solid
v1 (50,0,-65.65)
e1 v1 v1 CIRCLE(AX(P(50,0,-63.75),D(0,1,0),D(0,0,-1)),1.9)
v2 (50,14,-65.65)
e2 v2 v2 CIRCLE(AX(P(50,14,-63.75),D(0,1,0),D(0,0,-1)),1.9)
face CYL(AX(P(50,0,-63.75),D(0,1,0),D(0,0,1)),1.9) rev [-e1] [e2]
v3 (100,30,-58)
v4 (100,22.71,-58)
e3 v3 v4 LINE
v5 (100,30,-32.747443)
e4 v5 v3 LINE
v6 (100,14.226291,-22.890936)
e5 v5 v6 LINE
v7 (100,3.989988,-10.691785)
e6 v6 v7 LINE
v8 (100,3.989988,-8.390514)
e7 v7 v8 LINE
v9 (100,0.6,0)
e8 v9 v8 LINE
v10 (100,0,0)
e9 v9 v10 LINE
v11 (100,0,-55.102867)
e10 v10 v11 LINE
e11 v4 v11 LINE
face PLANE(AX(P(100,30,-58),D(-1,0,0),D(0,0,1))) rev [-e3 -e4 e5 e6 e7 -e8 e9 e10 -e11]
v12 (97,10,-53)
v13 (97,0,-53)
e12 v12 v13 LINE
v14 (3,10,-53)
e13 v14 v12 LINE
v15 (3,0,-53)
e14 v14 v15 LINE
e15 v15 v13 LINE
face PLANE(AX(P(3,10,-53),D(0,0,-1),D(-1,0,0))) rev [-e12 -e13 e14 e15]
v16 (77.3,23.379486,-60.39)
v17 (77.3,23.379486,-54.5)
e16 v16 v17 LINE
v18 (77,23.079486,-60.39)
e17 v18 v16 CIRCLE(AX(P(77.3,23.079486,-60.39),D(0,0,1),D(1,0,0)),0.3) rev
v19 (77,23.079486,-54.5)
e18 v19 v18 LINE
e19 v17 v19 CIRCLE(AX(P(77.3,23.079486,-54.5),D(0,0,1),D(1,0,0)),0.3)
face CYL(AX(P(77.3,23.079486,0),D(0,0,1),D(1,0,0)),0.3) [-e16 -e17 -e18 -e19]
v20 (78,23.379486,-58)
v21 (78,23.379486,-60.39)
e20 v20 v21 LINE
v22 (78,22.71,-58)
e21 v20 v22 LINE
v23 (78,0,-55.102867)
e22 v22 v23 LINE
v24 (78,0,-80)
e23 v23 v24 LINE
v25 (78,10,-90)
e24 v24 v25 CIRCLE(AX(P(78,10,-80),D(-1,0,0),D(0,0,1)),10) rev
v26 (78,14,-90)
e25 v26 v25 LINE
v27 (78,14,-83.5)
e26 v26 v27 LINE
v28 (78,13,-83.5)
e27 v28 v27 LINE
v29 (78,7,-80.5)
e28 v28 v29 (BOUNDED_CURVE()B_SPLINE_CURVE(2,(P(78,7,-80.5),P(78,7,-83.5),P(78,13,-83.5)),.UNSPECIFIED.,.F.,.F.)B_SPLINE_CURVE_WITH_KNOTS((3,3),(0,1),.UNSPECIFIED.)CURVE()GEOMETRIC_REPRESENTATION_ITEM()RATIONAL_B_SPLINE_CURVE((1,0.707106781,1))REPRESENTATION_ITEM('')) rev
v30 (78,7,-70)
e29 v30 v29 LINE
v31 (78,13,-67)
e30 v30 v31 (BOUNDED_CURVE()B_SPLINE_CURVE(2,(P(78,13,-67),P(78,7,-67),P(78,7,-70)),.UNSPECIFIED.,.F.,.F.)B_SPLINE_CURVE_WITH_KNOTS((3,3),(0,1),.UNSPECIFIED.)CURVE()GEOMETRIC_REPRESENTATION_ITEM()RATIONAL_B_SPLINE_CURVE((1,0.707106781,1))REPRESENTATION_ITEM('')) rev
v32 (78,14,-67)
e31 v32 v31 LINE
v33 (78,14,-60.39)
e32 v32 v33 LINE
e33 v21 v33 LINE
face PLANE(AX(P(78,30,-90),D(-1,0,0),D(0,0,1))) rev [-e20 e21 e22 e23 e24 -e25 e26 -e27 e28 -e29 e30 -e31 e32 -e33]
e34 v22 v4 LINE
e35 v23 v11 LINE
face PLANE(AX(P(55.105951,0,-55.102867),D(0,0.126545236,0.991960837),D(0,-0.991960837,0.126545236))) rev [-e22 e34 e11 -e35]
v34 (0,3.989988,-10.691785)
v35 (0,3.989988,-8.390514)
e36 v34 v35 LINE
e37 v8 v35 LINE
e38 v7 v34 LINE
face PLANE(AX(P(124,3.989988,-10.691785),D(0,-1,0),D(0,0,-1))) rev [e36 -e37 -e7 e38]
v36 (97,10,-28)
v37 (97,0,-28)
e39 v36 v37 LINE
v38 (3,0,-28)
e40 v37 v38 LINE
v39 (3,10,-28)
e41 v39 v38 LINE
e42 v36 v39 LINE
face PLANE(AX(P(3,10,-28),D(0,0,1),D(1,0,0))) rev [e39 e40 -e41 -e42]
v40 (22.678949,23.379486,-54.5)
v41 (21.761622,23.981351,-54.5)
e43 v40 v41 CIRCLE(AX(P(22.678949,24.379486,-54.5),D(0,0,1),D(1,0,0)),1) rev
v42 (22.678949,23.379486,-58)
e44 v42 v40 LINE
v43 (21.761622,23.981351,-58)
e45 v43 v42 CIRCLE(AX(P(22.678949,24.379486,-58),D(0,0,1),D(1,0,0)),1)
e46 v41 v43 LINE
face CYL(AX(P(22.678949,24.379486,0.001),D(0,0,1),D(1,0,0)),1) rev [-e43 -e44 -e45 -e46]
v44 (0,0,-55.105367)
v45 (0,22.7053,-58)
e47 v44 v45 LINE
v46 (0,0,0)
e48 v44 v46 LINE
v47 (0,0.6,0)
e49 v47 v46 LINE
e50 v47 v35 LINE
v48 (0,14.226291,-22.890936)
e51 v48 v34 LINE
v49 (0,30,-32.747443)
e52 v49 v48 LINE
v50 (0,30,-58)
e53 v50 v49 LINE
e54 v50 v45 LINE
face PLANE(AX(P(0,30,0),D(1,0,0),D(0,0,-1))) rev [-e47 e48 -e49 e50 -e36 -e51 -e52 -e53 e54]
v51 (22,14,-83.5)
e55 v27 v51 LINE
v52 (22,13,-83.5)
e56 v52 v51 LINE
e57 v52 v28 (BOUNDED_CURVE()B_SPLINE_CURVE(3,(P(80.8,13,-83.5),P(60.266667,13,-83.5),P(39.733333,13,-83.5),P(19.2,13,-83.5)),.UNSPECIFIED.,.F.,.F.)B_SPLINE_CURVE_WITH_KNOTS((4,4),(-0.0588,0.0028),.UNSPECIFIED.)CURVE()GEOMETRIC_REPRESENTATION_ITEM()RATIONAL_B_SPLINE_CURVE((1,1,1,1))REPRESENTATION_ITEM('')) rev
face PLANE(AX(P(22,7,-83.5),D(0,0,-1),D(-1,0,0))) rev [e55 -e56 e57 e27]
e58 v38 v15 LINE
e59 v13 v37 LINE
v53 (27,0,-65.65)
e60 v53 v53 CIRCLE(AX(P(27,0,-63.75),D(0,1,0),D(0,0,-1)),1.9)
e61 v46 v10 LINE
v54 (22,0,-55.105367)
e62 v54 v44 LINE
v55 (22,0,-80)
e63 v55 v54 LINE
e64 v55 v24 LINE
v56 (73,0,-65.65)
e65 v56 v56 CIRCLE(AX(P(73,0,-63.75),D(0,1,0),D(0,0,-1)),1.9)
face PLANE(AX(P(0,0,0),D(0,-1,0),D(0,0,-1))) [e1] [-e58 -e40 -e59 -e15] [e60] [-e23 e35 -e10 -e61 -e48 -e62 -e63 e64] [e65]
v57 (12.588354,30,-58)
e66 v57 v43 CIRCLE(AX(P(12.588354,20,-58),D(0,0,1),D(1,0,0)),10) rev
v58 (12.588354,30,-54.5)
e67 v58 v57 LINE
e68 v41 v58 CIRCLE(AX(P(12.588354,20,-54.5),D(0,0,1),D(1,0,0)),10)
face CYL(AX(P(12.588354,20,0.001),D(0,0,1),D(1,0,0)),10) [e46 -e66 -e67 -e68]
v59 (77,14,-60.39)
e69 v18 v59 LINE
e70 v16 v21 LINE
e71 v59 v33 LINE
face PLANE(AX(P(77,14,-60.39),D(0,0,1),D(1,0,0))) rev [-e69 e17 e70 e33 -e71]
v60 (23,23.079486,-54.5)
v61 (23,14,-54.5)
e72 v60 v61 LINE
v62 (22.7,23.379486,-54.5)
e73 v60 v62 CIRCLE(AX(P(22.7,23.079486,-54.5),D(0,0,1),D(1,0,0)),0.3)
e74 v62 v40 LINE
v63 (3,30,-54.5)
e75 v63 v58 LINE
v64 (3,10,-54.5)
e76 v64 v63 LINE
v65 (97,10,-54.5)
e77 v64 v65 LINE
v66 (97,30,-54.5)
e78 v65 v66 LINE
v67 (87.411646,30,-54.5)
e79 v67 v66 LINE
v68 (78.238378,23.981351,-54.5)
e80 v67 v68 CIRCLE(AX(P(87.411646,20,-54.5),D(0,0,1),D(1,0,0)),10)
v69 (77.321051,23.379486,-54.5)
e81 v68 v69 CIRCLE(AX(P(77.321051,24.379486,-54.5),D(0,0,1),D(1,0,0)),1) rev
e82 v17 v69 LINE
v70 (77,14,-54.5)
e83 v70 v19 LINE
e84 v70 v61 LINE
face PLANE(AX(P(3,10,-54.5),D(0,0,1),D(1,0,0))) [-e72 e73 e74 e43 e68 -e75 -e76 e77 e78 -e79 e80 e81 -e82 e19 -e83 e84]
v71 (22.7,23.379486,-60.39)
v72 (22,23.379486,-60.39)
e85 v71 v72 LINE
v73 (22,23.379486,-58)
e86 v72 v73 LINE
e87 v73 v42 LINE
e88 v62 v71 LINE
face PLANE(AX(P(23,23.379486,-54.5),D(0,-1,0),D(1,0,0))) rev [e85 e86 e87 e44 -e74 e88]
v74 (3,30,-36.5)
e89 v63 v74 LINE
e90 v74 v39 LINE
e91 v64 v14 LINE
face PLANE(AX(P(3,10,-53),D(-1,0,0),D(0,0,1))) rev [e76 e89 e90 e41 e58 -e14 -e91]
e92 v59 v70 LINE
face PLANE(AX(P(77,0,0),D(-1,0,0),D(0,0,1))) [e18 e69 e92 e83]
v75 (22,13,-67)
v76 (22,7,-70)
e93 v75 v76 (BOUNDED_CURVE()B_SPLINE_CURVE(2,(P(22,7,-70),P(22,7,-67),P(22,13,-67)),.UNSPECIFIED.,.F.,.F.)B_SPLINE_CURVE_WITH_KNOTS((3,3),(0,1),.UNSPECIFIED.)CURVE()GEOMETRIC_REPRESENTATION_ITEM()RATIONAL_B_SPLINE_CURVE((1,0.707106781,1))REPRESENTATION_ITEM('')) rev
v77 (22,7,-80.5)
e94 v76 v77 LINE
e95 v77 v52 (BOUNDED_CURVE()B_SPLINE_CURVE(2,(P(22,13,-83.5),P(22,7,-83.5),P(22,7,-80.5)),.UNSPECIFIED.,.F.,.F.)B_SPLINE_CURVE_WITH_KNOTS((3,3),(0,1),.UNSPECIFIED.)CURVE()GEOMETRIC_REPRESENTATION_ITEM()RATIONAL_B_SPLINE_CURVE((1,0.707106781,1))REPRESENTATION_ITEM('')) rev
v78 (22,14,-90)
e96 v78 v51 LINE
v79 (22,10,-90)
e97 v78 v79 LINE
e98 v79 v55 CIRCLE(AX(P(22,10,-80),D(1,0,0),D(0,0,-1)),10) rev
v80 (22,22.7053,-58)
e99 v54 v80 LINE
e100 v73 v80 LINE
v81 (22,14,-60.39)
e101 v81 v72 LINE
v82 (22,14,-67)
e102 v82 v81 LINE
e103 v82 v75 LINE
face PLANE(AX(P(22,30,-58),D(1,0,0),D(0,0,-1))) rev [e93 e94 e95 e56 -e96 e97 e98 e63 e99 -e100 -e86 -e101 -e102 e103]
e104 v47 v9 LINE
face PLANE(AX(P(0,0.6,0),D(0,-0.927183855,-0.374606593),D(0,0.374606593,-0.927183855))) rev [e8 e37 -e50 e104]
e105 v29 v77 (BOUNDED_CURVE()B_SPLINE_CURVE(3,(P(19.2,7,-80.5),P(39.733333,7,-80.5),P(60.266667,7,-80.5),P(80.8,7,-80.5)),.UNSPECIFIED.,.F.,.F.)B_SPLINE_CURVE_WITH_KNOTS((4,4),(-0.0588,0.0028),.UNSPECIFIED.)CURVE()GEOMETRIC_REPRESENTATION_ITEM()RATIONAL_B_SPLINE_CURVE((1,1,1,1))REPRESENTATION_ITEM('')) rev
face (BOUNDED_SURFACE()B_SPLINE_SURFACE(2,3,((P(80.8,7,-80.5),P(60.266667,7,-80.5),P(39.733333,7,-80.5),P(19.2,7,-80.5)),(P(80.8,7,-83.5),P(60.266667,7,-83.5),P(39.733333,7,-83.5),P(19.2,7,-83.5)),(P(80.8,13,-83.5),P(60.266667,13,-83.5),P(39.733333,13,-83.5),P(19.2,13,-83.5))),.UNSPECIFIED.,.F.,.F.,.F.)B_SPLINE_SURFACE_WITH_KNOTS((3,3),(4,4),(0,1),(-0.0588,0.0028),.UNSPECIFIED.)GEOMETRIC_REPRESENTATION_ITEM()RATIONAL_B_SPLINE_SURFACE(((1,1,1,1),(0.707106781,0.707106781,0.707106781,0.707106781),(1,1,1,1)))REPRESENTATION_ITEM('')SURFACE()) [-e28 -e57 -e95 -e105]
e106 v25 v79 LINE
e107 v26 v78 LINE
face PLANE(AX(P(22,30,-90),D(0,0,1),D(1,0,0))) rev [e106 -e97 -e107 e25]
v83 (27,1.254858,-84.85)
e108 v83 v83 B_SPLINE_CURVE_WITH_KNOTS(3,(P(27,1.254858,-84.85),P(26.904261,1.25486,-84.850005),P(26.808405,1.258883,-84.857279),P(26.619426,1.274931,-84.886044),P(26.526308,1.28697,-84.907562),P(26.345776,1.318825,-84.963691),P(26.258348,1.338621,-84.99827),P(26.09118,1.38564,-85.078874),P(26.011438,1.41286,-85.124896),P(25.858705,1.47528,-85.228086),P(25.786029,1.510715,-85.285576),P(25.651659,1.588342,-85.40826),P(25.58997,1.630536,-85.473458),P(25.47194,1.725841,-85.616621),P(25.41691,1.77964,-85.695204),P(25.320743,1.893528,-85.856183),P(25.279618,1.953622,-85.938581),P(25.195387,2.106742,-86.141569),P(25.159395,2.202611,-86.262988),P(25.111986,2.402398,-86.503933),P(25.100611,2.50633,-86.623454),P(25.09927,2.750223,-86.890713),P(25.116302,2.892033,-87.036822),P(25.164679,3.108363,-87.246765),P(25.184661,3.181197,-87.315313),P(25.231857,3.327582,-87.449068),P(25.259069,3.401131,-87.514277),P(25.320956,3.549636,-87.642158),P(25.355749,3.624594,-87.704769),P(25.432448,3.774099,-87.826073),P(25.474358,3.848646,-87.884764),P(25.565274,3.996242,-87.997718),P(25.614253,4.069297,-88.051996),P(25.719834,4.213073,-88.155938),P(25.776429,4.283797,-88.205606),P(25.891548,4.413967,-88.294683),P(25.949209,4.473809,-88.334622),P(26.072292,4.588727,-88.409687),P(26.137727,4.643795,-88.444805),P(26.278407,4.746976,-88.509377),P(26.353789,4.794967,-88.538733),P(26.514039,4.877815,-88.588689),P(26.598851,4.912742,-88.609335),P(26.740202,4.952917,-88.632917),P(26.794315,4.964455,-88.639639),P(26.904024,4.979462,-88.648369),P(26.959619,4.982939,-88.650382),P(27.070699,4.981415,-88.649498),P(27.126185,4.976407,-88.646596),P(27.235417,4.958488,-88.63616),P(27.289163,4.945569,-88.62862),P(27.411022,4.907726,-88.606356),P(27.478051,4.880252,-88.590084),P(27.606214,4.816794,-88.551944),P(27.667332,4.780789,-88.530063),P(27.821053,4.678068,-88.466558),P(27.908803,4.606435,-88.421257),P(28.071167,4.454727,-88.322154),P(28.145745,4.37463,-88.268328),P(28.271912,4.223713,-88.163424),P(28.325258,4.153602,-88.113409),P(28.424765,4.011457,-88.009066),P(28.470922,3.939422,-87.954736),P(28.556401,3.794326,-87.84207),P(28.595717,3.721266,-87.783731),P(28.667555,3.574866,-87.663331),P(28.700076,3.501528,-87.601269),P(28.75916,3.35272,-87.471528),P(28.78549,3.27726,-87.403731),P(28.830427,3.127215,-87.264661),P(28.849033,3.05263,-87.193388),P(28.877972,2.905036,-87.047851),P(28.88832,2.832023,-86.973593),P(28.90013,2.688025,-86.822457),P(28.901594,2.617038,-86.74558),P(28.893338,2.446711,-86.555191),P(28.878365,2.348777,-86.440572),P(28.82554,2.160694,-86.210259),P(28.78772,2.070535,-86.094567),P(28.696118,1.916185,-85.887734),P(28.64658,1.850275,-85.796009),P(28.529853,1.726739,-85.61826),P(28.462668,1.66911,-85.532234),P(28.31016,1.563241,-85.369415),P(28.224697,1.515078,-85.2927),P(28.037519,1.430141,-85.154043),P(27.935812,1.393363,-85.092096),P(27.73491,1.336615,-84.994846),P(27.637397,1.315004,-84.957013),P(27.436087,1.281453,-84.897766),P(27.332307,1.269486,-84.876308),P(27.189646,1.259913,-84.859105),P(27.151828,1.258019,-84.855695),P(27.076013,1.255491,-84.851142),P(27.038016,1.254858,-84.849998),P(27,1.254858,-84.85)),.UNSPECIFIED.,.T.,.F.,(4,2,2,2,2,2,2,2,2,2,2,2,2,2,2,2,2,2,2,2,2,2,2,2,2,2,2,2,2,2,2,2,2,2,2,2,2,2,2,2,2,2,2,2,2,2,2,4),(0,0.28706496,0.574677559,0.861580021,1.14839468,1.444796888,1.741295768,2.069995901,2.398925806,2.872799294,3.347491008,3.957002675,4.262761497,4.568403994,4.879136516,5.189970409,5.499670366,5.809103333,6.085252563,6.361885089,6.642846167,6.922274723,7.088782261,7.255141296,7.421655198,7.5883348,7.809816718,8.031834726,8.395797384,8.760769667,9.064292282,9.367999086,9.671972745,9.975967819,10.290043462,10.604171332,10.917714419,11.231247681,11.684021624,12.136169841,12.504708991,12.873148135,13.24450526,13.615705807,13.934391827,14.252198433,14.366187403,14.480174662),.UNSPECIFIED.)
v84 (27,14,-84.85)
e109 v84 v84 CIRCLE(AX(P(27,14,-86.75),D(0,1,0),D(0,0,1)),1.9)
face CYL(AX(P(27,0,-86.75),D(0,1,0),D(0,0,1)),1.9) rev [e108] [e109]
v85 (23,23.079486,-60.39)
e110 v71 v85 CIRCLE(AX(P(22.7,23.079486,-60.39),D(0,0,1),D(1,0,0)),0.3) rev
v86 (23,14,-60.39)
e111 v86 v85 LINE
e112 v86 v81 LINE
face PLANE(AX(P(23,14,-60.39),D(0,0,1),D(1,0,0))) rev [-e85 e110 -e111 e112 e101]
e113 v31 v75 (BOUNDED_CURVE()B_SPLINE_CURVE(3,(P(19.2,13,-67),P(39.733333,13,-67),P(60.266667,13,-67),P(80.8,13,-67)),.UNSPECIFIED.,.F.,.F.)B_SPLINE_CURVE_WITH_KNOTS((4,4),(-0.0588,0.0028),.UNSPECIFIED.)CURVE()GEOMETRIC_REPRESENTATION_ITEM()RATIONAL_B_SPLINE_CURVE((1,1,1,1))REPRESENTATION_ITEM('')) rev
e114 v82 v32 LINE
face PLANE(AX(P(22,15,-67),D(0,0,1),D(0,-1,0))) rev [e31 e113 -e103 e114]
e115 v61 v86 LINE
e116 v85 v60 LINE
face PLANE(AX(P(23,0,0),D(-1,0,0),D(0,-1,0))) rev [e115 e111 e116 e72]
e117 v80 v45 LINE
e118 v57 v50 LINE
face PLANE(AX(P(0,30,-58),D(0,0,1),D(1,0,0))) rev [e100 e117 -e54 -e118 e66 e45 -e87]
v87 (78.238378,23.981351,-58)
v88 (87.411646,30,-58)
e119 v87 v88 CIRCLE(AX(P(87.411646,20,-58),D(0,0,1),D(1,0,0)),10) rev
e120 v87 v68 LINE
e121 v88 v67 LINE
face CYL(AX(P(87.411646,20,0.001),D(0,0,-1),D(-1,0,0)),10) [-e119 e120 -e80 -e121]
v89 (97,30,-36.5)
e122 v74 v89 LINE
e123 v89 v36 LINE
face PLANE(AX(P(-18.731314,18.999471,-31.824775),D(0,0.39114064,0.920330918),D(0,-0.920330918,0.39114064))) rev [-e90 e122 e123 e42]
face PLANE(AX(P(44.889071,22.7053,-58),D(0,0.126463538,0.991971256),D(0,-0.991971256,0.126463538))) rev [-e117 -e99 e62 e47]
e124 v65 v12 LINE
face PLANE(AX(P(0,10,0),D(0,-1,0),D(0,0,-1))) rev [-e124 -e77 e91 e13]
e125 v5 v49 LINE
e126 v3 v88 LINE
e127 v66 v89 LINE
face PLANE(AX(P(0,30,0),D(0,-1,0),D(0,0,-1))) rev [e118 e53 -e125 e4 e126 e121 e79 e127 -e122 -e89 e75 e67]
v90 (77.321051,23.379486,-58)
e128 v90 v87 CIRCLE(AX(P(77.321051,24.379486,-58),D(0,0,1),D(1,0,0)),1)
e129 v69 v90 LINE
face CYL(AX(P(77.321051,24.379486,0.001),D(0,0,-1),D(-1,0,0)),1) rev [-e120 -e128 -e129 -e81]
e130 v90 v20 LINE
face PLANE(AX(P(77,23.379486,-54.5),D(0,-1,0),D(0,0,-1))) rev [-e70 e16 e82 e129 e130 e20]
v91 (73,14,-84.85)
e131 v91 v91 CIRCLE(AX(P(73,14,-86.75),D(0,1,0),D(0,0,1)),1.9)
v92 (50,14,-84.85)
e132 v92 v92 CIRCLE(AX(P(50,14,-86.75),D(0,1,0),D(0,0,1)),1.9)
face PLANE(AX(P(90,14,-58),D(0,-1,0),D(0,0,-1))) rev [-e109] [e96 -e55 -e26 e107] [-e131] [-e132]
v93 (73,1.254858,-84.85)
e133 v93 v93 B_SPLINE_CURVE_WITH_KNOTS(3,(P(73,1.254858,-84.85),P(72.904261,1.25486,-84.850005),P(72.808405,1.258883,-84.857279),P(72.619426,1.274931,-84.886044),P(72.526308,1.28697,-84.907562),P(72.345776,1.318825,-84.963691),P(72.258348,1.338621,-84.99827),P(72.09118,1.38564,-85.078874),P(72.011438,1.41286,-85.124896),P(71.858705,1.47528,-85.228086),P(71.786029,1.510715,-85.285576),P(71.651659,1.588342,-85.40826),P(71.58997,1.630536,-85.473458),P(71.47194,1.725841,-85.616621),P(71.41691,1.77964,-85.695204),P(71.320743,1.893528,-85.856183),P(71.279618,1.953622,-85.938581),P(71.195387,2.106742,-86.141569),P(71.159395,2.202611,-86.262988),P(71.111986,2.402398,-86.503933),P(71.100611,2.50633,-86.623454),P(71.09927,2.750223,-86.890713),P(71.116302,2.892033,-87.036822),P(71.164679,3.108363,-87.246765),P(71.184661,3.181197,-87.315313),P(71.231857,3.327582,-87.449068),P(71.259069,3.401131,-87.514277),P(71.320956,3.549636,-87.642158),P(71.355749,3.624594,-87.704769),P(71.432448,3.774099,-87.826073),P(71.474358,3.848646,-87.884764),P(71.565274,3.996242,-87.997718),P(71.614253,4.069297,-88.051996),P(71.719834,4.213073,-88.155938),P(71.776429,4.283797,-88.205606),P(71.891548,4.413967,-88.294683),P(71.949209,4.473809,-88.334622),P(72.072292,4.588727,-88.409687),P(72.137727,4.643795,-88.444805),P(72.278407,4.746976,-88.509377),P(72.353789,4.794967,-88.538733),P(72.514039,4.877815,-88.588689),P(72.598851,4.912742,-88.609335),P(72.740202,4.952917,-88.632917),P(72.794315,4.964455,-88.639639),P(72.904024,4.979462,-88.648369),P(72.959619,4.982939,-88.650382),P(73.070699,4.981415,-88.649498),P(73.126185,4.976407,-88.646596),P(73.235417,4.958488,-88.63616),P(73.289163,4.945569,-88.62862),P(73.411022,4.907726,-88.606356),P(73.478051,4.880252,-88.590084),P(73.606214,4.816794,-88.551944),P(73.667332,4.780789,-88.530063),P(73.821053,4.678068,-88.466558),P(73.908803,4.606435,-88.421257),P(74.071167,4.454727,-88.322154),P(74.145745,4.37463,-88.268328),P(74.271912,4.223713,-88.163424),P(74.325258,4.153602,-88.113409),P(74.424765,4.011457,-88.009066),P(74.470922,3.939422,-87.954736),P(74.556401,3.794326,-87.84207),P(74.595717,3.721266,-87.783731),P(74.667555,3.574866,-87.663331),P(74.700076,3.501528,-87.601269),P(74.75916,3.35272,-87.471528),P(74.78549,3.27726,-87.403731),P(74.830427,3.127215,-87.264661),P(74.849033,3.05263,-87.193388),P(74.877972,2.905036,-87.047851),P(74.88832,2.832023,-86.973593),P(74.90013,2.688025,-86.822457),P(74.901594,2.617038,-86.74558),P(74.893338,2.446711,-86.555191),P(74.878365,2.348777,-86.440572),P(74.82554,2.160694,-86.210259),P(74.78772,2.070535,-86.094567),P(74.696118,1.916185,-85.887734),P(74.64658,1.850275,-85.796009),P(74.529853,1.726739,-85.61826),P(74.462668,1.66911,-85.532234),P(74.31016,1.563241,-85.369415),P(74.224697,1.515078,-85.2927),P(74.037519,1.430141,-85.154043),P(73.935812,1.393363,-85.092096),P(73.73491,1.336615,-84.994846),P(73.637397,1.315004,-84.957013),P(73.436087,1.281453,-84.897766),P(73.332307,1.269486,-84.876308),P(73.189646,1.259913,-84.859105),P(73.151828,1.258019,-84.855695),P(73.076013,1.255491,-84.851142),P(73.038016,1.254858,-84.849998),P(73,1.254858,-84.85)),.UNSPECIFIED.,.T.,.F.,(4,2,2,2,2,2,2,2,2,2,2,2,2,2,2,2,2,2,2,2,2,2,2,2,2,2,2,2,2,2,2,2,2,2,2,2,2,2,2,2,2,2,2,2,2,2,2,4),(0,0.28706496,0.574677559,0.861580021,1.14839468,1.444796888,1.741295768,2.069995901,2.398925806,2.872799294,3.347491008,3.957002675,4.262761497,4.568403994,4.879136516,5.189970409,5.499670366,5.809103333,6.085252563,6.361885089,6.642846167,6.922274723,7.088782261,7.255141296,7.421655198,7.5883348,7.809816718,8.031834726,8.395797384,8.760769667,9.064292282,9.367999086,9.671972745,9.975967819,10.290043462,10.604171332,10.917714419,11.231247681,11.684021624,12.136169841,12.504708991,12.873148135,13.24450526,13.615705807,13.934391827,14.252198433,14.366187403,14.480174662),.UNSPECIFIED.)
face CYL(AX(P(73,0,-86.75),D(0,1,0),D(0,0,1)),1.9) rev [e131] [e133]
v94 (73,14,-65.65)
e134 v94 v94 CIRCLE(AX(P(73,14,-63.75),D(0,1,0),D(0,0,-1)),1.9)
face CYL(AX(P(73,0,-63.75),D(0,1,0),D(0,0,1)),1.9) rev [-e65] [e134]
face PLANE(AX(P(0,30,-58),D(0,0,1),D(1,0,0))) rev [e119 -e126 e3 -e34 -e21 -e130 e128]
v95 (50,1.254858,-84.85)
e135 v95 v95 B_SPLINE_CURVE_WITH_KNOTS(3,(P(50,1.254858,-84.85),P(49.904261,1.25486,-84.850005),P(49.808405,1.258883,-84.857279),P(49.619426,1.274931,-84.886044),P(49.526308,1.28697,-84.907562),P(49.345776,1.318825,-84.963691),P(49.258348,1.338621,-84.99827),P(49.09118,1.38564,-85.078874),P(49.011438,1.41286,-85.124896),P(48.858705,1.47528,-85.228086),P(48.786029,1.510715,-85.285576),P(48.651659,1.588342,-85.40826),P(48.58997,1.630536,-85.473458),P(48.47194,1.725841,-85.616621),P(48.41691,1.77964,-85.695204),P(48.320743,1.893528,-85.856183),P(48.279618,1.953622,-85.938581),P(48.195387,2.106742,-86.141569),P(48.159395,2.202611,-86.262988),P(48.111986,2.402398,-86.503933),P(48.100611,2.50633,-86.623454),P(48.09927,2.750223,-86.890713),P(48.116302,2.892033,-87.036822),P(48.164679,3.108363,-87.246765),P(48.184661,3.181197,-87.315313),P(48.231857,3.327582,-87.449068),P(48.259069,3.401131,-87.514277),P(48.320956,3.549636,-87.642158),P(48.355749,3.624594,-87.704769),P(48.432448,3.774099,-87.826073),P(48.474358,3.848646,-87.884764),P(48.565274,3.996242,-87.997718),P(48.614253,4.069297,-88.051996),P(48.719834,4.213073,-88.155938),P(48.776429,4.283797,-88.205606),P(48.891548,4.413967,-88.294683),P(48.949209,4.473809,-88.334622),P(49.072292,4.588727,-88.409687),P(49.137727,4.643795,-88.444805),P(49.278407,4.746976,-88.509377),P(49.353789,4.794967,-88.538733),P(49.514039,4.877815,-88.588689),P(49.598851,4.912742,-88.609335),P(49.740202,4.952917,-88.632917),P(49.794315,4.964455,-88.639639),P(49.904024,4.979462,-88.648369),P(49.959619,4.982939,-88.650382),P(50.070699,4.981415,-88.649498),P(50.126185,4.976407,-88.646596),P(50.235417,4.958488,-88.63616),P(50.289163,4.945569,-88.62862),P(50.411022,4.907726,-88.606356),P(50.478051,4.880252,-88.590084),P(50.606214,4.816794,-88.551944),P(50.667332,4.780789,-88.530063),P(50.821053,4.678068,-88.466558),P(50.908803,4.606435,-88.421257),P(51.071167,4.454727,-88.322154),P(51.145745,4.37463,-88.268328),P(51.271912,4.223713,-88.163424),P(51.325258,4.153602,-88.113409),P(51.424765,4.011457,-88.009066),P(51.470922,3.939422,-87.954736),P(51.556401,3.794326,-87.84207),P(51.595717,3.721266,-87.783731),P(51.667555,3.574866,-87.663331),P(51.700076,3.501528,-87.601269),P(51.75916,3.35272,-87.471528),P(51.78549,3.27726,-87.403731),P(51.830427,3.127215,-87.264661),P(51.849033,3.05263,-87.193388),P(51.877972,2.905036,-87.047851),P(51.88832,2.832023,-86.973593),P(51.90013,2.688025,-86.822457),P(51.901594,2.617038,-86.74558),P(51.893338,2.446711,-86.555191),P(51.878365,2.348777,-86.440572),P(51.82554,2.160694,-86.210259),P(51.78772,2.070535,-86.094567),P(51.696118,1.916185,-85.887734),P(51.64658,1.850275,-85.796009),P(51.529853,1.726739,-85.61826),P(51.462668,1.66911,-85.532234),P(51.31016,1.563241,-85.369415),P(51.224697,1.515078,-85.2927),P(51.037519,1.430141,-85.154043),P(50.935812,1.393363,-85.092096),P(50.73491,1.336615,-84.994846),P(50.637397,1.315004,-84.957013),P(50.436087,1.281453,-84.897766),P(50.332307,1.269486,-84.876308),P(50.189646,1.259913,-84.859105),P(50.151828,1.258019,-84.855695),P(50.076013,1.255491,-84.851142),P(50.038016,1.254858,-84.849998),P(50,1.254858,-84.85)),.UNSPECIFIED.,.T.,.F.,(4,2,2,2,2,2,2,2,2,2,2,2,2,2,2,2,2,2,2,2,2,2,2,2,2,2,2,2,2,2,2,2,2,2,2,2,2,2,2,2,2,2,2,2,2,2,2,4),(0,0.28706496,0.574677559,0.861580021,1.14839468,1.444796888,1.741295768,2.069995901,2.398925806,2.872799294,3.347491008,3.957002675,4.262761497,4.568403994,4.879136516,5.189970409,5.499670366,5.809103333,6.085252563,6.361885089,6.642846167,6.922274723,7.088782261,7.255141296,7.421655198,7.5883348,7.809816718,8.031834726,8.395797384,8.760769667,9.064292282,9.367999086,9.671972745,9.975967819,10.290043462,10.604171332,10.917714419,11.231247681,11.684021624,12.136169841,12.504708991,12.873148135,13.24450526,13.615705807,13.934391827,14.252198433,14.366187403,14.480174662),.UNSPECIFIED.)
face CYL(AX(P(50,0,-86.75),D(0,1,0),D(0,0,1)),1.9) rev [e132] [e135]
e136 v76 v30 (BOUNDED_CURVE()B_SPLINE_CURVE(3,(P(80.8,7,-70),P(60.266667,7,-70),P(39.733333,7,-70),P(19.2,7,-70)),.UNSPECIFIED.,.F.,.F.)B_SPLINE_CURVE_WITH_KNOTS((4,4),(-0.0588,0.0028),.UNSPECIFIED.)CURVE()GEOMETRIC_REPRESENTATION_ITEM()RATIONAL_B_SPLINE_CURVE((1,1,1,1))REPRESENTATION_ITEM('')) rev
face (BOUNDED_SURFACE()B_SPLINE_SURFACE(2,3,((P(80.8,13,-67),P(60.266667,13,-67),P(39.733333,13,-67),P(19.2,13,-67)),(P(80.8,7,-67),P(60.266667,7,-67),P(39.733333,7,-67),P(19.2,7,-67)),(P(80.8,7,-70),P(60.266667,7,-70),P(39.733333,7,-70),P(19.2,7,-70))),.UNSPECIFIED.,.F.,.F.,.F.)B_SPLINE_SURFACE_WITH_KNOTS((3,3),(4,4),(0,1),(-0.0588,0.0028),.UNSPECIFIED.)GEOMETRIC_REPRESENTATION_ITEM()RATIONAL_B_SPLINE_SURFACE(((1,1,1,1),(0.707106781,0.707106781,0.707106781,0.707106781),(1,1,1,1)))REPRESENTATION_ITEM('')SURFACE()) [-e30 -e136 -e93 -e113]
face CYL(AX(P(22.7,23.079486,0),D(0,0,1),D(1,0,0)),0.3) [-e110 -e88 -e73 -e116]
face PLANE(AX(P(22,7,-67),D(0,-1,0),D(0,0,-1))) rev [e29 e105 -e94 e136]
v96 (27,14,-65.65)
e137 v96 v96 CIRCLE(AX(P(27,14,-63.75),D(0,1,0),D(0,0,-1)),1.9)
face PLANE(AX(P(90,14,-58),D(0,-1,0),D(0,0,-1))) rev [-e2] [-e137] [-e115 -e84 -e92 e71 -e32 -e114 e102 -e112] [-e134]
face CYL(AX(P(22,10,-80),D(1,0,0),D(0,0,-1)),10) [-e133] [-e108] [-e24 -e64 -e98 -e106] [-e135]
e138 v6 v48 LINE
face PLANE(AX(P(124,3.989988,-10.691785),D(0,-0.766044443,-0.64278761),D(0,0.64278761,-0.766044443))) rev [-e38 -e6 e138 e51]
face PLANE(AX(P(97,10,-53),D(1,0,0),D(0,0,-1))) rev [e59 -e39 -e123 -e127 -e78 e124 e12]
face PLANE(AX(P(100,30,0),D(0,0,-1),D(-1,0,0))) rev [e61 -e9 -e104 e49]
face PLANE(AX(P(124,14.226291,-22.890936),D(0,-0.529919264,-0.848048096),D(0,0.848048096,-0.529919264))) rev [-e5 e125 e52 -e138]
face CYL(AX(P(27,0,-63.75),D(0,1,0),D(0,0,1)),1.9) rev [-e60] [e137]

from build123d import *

# Parameters (mm, degrees)
RESSALTO_EXTRUS_O1_DEPTH = 30
CORTE_EXTRUS_O1_DEPTH    = 100
ESBO_O4_W                = 94
ESBO_O4_H                = 25
CORTE_EXTRUS_O2_DEPTH    = 10
ESBO_O5_W                = 94
ESBO_O5_H                = 18
CORTE_EXTRUS_O3_DEPTH    = 20
CORTE_EXTRUS_O7_START    = -3
CORTE_EXTRUS_O7_DEPTH    = 94
ESBO_O8_W                = 32
ESBO_O8_H                = 15
CORTE_EXTRUS_O8_DEPTH    = 56
ESBO_O9_W                = 16.5
ESBO_O9_H                = 8
CORTE_EXTRUS_O9_DEPTH    = 56
FILETE1_SIZE             = 3
FILETE1_SIZE_2           = 6
FILETE2_SIZE             = 3
FILETE2_SIZE_2           = 6
FILETE3_R                = 10
ESBO_O12_W               = 32
ESBO_O12_H               = 1
CORTE_EXTRUS_O12_DEPTH   = 68
CORTE_EXTRUS_O13_REACH   = 121.432
ESBO_O14_W               = 56
ESBO_O14_H               = 16
CORTE_EXTRUS_O14_DEPTH   = 138.840487586
ESBO_O16_R               = 1.9
CORTE_EXTRUS_O15_DEPTH   = 136.484316502
ESBO_O19_W               = 5.89
ESBO_O19_H               = 9.379485794
RESSALTO_EXTRUS_O4_DEPTH = 1
ESBO_O20_W               = 5.89
ESBO_O20_H               = 9.379485794
RESSALTO_EXTRUS_O5_DEPTH = 1
FILETE5_R                = 10
FILETE6_R                = 0.3
FILETE7_R                = 1
CORTE_EXTRUS_O17_DEPTH   = 22
CORTE_EXTRUS_O18_DEPTH   = 22
CORTE_EXTRUS_O19_DEPTH   = 124


with BuildPart() as part:
    # Esboço2 → Ressalto-extrusão1 (new body)
    with BuildSketch(Plane(origin=(0, 0, 0), x_dir=(1, 0, 0), z_dir=(0, 1, 0))):
        Polygon((0, 0), (0, 58), (22, 58), (22, 90), (78, 90), (78, 58), (100, 58), (100, 0), align=None)
    extrude(amount=RESSALTO_EXTRUS_O1_DEPTH)

    # Esboço3 → Corte-extrusão1 (cut)
    with BuildSketch(Plane(origin=(100, 0, 0), x_dir=(0, 0, -1), z_dir=(1, 0, 0))):
        Polygon((0, 0.6), (9.828405069, 4.570933406), (22.126818959, 14.890527965), (31.568264957, 30), (0, 30), align=None)
    extrude(amount=-CORTE_EXTRUS_O1_DEPTH, mode=Mode.SUBTRACT)

    # Esboço4 → Corte-extrusão2 (cut)
    with BuildSketch(Plane.XZ):
        with Locations((50, -40.5)):
            Rectangle(ESBO_O4_W, ESBO_O4_H)
    extrude(amount=-CORTE_EXTRUS_O2_DEPTH, mode=Mode.SUBTRACT)

    # Esboço5 → Corte-extrusão3 (cut)
    with BuildSketch(Plane(origin=(0, 30, 0), x_dir=(1, 0, 0), z_dir=(0, 1, 0))):
        with Locations((50, 45.5)):
            Rectangle(ESBO_O5_W, ESBO_O5_H)
    extrude(amount=-CORTE_EXTRUS_O3_DEPTH, mode=Mode.SUBTRACT)

    # Esboço7 → Corte-extrusão7 (cut)
    with BuildSketch(Plane(origin=(100, 0, 0), x_dir=(0, 0, -1), z_dir=(1, 0, 0)).offset(CORTE_EXTRUS_O7_START)):
        Polygon((28, 10), (36.5, 30), (36.5, 10), align=None)
    extrude(amount=-CORTE_EXTRUS_O7_DEPTH, mode=Mode.SUBTRACT)

    # Esboço8 → Corte-extrusão8 (cut)
    with BuildSketch(Plane(origin=(78, 0, 0), x_dir=(0, 0, -1), z_dir=(1, 0, 0))):
        with Locations((74, 22.5)):
            Rectangle(ESBO_O8_W, ESBO_O8_H)
    extrude(amount=-CORTE_EXTRUS_O8_DEPTH, mode=Mode.SUBTRACT)

    # Esboço9 → Corte-extrusão9 (cut)
    with BuildSketch(Plane(origin=(78, 0, 0), x_dir=(0, 0, -1), z_dir=(1, 0, 0))):
        with Locations((75.25, 11)):
            Rectangle(ESBO_O9_W, ESBO_O9_H)
    extrude(amount=-CORTE_EXTRUS_O9_DEPTH, mode=Mode.SUBTRACT)

    # Filete1
    # an asymmetric fillet: 6, 3 mm, written as the material it adds along each edge
    with BuildSketch(Plane(origin=(78, 7, -67), x_dir=(0, 0, -1), z_dir=(-1, 0, 0))) as filete1_piece_1:
        with BuildLine():
            Bezier((FILETE1_SIZE, 0), (0, 0), (0, -FILETE1_SIZE_2), weights=[1, 0.707106781, 1])
            Line((0, -FILETE1_SIZE_2), (0, 0))
            Line((0, 0), (FILETE1_SIZE, 0))
        make_face()
    extrude(amount=56)

    # Filete2
    # an asymmetric fillet: 6, 3 mm, written as the material it adds along each edge
    with BuildSketch(Plane(origin=(78, 7, -83.5), x_dir=(0, 0, 1), z_dir=(-1, 0, 0))) as filete2_piece_1:
        with BuildLine():
            Bezier((FILETE2_SIZE, 0), (0, 0), (0, FILETE2_SIZE_2), weights=[1, 0.707106781, 1])
            Line((0, FILETE2_SIZE_2), (0, 0))
            Line((0, 0), (FILETE2_SIZE, 0))
        make_face()
    extrude(amount=56)

    # Filete3
    filete3_edges = [part.edges().sort_by_distance(p)[0] for p in [
        (50, 0, -90),
    ]]
    fillet(filete3_edges, radius=FILETE3_R)

    # Esboço12 → Corte-extrusão12 (cut)
    with BuildSketch(Plane.ZY.offset(-22)):
        with Locations((-74, 14.5)):
            Rectangle(ESBO_O12_W, ESBO_O12_H)
    extrude(amount=-CORTE_EXTRUS_O12_DEPTH, mode=Mode.SUBTRACT)

    # Esboço14 → Corte-extrusão13 (cut, up to next)
    with BuildSketch(Plane(origin=(0, 0, -58), x_dir=(-1, 0, 0), z_dir=(0, 0, -1)), mode=Mode.PRIVATE) as corte_extrus_o13_sk1:
        with Locations((-50, 22)):
            Rectangle(ESBO_O14_W, ESBO_O14_H)
    corte_extrus_o13_tool1 = extrude(corte_extrus_o13_sk1.sketch, amount=-CORTE_EXTRUS_O13_REACH, mode=Mode.PRIVATE) & part.part
    add(corte_extrus_o13_tool1.solids().sort_by_distance((50, 22, -58))[0], mode=Mode.SUBTRACT)

    # Esboço15 → Corte-extrusão14 (cut, through all)
    with BuildSketch(Plane(origin=(100, 0, 0), x_dir=(0, 0, -1), z_dir=(1, 0, 0))):
        Polygon((9.048997211, 4.256032191), (10.048997211, 4.256032191), (10.048997211, 4.756032191), align=None)
    extrude(amount=-CORTE_EXTRUS_O14_DEPTH, mode=Mode.SUBTRACT)

    # Esboço16 → Corte-extrusão15 (cut, through all)
    with BuildSketch(Plane(origin=(0, 14, 0), x_dir=(1, 0, 0), z_dir=(0, 1, 0))):
        with Locations(Location((73, 86.75, 0), (0, 0, 270))):
            Circle(ESBO_O16_R)
        with Locations(Location((27, 86.75, 0), (0, 0, 270))):
            Circle(ESBO_O16_R)
        with Locations(Location((73, 63.75, 0), (0, 0, 90))):
            Circle(ESBO_O16_R)
        with Locations(Location((27, 63.75, 0), (0, 0, 90))):
            Circle(ESBO_O16_R)
        with Locations(Location((50, 86.75, 0), (0, 0, 270))):
            Circle(ESBO_O16_R)
        with Locations(Location((50, 63.75, 0), (0, 0, 90))):
            Circle(ESBO_O16_R)
    extrude(amount=-CORTE_EXTRUS_O15_DEPTH, mode=Mode.SUBTRACT)

    # Esboço19 → Ressalto-extrusão4 (add)
    with BuildSketch(Plane.ZY.offset(-78)):
        with Locations((-57.445, 18.689742897)):
            Rectangle(ESBO_O19_W, ESBO_O19_H)
    extrude(amount=RESSALTO_EXTRUS_O4_DEPTH)

    # Esboço20 → Ressalto-extrusão5 (add)
    with BuildSketch(Plane(origin=(22, 0, 0), x_dir=(0, 0, -1), z_dir=(1, 0, 0))):
        with Locations((57.445, 18.689742897)):
            Rectangle(ESBO_O20_W, ESBO_O20_H)
    extrude(amount=RESSALTO_EXTRUS_O5_DEPTH)

    # Filete5
    # the kernel refuses this fillet: 10 mm, written as the material it takes off along each edge
    with BuildSketch(Plane(origin=(22, 30, -81.529114381), x_dir=(0, -1, 0), z_dir=(0, 0, 1))) as filete5_piece_1_section:
        with BuildLine():
            CenterArc((10, -9.411645752), FILETE5_R, 109.75193963, 70.24806037)
            Line((0, -9.411645752), (0, 0))
            Line((0, 0), (6.620514206, 0))
        make_face()
    filete5_piece_1 = extrude(amount=50.558228762, mode=Mode.PRIVATE)
    filete5_piece_1 = split(filete5_piece_1, bisect_by=Plane(origin=(18.353344597, 35.581105786, -38.871969959), z_dir=(0, -0.39114064034485163, -0.9203309184584747)), keep=Keep.TOP, mode=Mode.PRIVATE)
    add(filete5_piece_1, mode=Mode.SUBTRACT)
    with BuildSketch(Plane(origin=(78, 30, -81.529114381), x_dir=(0, -1, 0), z_dir=(0, 0, 1))) as filete5_piece_2_section:
        with BuildLine():
            CenterArc((10, 9.411645752), FILETE5_R, 180, 70.24806037)
            Line((0, 9.411645752), (0, 0))
            Line((0, 0), (6.620514206, 0))
        make_face()
    filete5_piece_2 = extrude(amount=50.558228762, mode=Mode.PRIVATE)
    filete5_piece_2 = split(filete5_piece_2, bisect_by=Plane(origin=(81.646655403, 35.581105786, -38.871969959), z_dir=(0, -0.39114064034485163, -0.9203309184584747)), keep=Keep.TOP, mode=Mode.PRIVATE)
    add(filete5_piece_2, mode=Mode.SUBTRACT)

    # Filete6
    filete6_edges = [part.edges().sort_by_distance(p)[0] for p in [
        (77, 23.379485794, -57.445),
        (23, 23.379485794, -57.445),
    ]]
    fillet(filete6_edges, radius=FILETE6_R)

    # Filete7
    filete7_edges = [part.edges().sort_by_distance(p)[0] for p in [
        (78, 23.379485794, -56.25),
        (22, 23.379485794, -56.25),
    ]]
    fillet(filete7_edges, radius=FILETE7_R)

    # Esboço22 → Corte-extrusão17 (cut)
    with BuildSketch(Plane.ZY):
        Polygon((-58, 0), (-58, 22.70530007), (-55.105367164, 0), align=None)
    extrude(amount=-CORTE_EXTRUS_O17_DEPTH, mode=Mode.SUBTRACT)

    # Esboço23 → Corte-extrusão18 (cut)
    with BuildSketch(Plane(origin=(100, 0, 0), x_dir=(0, 0, -1), z_dir=(1, 0, 0))):
        Polygon((58, 0), (55.102867158, 0), (58, 22.71), align=None)
    extrude(amount=-CORTE_EXTRUS_O18_DEPTH, mode=Mode.SUBTRACT)

    # Esboço27 → Corte-extrusão19 (cut)
    with BuildSketch(Plane.ZY):
        Polygon((-31.568264957, 30), (-22.126818959, 14.890527965), (-10.048997211, 4.756032191), (-7.995032748, 3.989987748), (-10.691784821, 3.989987748), (-22.89093609, 14.226291078), (-32.747443361, 30), align=None)
    extrude(amount=-CORTE_EXTRUS_O19_DEPTH, mode=Mode.SUBTRACT)


solid = part.part
